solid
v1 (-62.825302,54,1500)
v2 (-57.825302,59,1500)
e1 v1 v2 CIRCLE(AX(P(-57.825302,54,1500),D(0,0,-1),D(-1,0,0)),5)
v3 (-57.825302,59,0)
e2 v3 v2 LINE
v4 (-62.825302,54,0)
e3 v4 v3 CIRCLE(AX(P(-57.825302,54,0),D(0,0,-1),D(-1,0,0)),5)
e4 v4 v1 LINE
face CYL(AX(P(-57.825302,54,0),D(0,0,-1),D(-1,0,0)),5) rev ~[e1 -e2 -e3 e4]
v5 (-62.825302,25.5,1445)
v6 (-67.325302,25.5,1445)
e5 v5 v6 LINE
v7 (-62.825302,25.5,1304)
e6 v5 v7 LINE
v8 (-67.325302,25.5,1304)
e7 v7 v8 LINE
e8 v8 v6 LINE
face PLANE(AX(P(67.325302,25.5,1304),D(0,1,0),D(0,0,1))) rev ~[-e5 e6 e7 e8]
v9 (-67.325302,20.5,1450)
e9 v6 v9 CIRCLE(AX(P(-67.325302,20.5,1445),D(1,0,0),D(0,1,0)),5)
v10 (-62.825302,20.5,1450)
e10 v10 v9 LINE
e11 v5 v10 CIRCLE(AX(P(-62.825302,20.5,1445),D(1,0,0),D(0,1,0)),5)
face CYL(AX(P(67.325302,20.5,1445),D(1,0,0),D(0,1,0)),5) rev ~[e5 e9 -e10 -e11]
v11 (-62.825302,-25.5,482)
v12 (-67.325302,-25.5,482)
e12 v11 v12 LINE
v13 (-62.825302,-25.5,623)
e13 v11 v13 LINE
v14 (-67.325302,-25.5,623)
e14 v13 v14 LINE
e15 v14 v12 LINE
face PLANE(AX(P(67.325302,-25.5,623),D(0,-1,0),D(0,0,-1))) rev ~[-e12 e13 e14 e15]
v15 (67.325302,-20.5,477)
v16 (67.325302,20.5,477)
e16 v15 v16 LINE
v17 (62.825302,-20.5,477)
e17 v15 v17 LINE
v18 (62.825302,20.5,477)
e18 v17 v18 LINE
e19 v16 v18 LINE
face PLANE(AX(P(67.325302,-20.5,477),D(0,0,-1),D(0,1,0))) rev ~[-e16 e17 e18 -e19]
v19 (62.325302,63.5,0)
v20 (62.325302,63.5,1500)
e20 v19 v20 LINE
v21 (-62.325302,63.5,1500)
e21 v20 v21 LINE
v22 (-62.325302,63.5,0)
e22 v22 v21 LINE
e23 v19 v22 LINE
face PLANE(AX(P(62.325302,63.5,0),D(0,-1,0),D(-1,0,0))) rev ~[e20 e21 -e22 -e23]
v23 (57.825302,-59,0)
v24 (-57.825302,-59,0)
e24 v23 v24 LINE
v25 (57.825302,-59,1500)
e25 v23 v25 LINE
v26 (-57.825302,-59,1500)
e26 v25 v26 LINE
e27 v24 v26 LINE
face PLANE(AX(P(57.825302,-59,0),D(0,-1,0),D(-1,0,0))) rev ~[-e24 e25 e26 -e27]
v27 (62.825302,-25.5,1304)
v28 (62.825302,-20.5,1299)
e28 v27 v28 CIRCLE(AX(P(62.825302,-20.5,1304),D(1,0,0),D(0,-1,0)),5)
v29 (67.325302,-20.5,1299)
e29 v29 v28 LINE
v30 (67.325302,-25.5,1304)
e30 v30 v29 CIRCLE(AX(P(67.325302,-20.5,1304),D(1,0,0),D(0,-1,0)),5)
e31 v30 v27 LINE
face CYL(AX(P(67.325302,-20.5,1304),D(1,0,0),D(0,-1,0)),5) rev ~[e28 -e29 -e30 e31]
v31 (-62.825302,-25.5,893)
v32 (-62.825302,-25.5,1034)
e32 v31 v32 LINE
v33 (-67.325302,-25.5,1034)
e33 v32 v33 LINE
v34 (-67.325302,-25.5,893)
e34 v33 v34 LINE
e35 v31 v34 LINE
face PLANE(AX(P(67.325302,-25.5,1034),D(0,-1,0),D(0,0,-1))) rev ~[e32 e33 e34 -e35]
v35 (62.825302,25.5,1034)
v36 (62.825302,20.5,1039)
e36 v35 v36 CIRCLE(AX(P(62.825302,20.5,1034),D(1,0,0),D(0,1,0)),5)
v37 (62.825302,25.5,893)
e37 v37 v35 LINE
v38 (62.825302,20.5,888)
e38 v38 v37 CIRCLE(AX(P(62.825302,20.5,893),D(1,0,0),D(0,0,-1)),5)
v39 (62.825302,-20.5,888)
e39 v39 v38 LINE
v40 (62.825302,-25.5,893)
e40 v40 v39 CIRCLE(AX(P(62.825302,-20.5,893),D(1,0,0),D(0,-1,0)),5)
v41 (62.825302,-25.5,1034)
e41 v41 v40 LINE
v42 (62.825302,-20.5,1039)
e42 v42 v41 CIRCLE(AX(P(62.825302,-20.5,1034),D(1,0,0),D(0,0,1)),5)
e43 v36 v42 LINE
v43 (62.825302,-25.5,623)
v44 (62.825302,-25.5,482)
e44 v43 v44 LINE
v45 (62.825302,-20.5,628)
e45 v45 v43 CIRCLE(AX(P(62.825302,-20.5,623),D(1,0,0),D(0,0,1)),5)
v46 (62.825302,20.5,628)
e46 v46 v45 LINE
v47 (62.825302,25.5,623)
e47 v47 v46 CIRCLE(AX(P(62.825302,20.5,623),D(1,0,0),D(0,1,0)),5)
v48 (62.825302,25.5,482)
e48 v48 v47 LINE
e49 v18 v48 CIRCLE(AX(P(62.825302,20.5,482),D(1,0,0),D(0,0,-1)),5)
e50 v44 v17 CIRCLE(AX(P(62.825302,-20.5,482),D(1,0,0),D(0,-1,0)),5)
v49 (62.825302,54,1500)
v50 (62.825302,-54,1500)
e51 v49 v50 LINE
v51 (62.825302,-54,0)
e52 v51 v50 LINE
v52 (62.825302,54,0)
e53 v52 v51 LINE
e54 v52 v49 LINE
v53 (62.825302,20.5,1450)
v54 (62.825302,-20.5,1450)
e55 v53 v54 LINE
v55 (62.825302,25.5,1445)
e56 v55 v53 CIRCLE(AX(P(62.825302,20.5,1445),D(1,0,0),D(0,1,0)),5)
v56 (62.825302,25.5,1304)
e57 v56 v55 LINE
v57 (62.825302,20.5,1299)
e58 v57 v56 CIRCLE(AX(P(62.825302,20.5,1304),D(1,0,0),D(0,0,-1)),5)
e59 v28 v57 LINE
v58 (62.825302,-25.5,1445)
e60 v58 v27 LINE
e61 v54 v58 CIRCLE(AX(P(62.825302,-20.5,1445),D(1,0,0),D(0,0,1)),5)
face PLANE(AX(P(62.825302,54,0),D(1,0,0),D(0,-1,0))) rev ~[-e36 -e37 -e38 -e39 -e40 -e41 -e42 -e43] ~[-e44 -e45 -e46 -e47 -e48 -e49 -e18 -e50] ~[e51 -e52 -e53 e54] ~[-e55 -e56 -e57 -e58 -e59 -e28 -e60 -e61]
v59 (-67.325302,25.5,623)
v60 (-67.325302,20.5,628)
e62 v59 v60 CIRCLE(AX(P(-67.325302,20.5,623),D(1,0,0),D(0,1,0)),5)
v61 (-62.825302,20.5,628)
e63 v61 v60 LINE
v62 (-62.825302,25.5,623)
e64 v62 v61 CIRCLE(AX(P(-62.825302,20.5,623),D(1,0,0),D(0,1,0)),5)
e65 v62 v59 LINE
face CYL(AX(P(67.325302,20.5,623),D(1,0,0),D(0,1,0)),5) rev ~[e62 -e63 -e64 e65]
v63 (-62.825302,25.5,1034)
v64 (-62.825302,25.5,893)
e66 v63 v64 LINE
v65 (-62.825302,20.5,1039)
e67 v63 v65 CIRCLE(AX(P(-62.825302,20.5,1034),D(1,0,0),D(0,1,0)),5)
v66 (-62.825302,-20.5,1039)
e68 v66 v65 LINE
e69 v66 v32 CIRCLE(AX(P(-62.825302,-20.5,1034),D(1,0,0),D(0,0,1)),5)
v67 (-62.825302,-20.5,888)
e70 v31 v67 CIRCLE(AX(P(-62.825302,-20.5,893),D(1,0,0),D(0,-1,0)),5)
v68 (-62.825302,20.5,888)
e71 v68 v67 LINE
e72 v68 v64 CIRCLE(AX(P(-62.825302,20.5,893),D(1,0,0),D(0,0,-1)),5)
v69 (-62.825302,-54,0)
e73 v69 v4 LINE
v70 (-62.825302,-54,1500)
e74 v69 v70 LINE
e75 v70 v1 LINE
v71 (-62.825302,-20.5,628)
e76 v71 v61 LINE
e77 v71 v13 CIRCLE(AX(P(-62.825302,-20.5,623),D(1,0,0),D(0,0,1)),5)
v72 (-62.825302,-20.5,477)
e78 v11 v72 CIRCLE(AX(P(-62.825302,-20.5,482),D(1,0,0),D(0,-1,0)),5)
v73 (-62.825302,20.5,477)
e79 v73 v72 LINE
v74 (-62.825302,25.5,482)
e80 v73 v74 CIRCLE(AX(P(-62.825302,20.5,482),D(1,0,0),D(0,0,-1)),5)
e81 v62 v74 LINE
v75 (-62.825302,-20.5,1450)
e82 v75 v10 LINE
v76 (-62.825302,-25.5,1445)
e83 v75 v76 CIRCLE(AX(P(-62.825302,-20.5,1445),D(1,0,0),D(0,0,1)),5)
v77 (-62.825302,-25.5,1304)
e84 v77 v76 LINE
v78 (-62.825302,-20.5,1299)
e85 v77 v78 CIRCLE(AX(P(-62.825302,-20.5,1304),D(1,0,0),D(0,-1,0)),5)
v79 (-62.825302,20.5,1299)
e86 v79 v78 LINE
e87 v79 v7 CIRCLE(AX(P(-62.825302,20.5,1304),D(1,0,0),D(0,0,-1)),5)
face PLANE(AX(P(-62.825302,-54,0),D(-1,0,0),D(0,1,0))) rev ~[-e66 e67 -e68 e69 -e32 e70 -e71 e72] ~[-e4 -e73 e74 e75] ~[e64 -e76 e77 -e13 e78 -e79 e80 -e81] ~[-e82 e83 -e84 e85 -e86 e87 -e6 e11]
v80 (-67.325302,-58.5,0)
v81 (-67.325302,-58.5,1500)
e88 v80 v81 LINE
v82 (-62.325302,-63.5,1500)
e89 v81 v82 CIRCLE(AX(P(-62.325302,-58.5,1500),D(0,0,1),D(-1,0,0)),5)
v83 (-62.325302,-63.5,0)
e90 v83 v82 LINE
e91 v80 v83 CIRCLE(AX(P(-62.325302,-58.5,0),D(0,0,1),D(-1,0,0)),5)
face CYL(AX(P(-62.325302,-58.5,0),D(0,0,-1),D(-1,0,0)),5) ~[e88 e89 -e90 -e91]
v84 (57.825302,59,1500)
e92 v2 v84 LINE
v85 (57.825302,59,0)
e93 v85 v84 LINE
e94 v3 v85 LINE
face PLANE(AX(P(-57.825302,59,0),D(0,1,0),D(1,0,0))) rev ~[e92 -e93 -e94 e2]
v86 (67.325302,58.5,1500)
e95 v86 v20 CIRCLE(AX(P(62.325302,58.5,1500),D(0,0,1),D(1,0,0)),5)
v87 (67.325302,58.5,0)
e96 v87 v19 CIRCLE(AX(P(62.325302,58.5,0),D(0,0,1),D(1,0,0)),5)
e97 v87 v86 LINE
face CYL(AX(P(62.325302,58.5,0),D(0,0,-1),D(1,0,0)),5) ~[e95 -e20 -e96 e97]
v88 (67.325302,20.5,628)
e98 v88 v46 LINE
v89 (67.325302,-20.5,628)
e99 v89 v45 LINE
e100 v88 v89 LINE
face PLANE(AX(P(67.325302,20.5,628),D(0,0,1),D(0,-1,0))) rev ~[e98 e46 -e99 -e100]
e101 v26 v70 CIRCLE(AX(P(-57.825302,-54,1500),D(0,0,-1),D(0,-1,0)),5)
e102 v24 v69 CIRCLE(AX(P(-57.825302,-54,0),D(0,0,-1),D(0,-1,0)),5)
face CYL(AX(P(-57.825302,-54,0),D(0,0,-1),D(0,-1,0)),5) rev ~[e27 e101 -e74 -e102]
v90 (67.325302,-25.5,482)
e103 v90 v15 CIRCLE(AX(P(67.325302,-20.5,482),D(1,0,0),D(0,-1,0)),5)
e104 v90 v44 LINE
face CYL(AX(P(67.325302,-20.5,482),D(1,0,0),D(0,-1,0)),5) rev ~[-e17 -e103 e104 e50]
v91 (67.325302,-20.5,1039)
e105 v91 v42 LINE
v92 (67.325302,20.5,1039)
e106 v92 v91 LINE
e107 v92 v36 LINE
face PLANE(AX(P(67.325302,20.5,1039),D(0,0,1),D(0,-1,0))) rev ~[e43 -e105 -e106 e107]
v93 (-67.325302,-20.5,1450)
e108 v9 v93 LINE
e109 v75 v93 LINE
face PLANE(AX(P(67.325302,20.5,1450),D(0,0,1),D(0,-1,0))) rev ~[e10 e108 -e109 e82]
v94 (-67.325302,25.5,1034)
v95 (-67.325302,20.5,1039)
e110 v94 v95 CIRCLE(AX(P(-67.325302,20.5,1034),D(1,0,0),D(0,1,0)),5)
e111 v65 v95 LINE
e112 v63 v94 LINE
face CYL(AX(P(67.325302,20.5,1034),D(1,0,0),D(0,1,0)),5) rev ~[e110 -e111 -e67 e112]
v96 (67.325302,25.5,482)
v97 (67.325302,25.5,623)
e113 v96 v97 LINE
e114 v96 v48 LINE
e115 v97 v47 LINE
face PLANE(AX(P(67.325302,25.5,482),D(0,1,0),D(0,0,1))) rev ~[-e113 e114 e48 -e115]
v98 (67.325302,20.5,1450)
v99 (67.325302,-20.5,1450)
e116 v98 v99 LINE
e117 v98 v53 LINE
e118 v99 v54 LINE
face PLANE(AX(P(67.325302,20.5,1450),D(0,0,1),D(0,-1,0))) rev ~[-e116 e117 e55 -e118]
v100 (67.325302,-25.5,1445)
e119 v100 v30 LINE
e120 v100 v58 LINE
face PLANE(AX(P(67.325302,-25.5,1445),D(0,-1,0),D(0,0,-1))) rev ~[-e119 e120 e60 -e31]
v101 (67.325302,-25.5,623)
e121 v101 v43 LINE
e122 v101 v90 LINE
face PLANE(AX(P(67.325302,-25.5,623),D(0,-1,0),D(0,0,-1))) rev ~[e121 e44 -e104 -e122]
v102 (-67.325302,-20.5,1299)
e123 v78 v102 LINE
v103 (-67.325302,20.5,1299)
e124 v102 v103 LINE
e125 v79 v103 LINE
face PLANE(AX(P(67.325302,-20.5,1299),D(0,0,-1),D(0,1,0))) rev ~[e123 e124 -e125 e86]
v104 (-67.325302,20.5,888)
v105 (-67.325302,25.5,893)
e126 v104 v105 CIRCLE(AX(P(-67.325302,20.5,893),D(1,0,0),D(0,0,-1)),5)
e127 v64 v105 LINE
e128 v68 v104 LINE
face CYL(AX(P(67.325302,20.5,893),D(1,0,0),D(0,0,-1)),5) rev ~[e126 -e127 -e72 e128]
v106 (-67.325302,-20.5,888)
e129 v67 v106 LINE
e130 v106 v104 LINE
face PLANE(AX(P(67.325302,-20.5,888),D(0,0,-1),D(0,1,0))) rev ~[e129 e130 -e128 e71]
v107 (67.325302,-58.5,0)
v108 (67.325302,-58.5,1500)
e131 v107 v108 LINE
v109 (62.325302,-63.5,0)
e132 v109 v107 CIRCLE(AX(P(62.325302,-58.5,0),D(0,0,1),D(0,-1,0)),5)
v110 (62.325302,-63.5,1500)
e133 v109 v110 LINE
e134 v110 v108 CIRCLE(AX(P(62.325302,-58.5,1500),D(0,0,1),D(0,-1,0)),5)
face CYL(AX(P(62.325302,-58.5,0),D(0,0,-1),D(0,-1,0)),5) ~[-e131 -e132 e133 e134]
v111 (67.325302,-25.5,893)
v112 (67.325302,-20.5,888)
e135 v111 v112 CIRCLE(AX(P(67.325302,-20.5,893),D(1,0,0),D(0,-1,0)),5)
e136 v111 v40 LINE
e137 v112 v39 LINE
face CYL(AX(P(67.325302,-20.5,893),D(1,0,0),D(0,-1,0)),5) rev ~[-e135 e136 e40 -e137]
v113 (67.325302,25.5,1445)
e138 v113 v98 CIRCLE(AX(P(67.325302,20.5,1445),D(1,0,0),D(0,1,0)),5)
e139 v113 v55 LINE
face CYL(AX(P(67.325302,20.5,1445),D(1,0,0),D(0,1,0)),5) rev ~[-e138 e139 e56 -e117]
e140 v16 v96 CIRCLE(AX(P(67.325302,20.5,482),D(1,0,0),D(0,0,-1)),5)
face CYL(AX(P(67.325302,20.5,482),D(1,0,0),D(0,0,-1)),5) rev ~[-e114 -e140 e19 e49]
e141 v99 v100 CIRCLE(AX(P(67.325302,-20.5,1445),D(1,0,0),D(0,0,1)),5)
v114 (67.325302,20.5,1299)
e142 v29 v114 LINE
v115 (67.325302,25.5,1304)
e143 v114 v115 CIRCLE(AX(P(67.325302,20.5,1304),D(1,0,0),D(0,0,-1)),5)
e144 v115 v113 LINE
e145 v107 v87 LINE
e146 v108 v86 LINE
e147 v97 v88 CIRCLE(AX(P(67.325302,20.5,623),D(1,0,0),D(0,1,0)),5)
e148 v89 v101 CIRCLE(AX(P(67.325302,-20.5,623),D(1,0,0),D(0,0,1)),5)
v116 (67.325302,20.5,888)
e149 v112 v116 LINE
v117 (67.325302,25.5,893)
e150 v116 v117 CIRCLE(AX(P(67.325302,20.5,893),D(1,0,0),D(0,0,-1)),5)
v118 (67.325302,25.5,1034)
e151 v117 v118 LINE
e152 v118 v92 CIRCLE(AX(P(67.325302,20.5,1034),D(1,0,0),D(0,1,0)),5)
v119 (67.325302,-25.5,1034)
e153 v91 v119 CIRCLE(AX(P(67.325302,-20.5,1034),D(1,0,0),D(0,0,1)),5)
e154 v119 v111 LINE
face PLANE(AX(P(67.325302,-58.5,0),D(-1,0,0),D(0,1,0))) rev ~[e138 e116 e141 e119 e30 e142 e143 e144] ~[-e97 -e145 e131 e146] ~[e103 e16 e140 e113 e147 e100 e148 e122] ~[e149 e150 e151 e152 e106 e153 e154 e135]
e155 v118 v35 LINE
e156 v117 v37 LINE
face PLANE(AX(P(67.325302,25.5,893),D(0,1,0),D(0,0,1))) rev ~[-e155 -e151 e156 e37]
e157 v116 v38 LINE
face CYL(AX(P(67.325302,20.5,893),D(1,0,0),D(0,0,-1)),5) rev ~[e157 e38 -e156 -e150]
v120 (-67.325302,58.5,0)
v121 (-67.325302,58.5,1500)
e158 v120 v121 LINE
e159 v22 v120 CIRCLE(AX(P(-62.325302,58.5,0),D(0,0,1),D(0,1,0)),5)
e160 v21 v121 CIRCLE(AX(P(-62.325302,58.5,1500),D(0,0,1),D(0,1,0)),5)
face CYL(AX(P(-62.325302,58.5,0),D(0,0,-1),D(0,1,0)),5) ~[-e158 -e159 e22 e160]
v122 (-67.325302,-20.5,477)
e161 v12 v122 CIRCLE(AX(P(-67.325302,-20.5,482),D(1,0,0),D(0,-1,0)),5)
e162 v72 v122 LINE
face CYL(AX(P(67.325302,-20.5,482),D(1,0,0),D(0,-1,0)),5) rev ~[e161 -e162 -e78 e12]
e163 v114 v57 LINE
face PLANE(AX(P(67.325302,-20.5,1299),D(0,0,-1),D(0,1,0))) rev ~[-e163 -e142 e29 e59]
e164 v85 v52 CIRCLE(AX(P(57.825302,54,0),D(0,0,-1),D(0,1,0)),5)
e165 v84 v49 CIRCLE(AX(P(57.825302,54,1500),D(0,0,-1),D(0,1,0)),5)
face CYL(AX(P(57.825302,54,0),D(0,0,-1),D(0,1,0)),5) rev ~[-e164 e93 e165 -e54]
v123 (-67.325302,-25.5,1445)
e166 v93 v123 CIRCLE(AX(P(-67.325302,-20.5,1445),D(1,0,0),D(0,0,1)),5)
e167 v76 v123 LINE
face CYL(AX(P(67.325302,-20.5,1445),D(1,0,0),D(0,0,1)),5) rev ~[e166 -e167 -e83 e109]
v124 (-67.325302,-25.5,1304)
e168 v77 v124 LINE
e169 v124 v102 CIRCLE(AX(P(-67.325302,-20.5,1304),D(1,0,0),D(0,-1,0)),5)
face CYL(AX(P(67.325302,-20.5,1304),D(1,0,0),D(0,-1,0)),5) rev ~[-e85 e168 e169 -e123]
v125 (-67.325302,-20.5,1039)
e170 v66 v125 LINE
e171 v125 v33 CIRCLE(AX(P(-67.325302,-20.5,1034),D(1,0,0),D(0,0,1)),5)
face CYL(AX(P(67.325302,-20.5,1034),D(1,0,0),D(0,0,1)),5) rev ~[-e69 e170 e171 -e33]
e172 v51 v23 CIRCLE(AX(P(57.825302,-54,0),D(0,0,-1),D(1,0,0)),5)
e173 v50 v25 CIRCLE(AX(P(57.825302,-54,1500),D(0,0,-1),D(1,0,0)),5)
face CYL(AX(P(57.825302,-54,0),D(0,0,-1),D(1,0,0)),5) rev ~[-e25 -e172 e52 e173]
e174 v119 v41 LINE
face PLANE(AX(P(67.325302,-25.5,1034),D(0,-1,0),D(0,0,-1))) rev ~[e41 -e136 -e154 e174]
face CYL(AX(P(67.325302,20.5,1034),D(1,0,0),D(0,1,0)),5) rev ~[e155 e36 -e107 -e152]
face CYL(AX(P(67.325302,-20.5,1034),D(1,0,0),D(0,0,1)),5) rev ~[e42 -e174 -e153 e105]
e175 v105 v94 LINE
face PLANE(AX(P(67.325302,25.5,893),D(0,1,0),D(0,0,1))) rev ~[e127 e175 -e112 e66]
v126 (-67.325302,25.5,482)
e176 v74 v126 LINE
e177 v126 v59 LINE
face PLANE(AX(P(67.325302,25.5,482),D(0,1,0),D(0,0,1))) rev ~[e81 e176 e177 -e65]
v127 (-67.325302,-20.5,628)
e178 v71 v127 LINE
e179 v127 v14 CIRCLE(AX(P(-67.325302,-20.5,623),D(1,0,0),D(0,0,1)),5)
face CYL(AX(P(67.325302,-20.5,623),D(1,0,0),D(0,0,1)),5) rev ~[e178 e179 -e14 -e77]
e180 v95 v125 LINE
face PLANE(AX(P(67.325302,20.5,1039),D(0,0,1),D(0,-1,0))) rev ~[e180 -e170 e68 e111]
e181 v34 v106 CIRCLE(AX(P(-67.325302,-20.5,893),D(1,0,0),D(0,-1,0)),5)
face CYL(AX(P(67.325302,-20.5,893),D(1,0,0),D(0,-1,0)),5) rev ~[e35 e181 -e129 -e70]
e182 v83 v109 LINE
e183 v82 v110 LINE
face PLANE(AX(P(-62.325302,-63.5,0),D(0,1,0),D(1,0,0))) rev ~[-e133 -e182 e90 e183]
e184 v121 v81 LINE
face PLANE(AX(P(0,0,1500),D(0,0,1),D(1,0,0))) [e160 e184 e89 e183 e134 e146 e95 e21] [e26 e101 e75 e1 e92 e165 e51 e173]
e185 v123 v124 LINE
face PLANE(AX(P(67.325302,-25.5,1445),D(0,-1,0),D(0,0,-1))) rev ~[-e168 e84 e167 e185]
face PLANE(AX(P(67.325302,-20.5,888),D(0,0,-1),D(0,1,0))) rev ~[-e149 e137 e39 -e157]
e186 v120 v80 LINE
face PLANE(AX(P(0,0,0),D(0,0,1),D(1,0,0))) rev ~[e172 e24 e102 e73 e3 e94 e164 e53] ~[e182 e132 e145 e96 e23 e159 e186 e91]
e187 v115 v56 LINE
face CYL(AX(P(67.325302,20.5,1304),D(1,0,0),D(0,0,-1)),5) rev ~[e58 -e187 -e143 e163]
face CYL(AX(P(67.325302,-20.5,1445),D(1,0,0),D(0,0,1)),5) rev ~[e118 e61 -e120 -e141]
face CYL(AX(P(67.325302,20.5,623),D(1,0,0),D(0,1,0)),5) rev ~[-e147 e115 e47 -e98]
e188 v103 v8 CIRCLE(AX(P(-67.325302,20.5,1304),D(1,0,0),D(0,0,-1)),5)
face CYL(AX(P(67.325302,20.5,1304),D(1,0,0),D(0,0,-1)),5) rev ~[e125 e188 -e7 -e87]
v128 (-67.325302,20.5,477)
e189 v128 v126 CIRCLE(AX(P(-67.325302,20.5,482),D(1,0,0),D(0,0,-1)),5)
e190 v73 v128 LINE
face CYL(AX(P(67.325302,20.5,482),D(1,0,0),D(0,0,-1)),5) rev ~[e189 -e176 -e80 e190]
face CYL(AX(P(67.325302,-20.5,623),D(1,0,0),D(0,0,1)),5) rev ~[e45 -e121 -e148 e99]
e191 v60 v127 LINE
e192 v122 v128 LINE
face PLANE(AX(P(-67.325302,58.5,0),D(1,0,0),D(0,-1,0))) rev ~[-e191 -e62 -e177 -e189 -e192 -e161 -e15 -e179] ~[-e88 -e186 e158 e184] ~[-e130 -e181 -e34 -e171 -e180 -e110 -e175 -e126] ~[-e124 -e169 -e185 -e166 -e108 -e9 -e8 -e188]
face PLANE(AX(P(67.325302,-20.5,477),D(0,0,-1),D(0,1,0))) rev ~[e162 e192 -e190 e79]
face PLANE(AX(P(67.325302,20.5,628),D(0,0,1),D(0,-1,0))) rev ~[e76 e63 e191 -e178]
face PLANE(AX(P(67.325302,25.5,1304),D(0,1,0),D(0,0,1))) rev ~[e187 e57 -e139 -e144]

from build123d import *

# Parameters (mm, degrees)
F1_DEPTH = 1500
F4_DEPTH = 150


# Not quite as in the source:
# - the program builds the solid bodies; features that only make, move or delete a surface that nothing else refers to are left out


with BuildPart() as f1:
    # F0 (on Top) → F1 (new body)
    with BuildSketch(Plane.XY):
        with BuildLine():
            Line((-62.3253015232, -63.5), (62.3253015232, -63.5))
            ThreePointArc((62.3253015232, -63.5), (65.8608354292, -62.0355339059), (67.3253015232, -58.5))
            Line((67.3253015232, -58.5), (67.3253015232, 58.5))
            ThreePointArc((67.3253015232, 58.5), (65.8608354292, 62.0355339059), (62.3253015232, 63.5))
            Line((62.3253015232, 63.5), (-62.3253015232, 63.5))
            ThreePointArc((-62.3253015232, 63.5), (-65.8608354292, 62.0355339059), (-67.3253015232, 58.5))
            Line((-67.3253015232, 58.5), (-67.3253015232, -58.5))
            ThreePointArc((-67.3253015232, -58.5), (-65.8608354292, -62.0355339059), (-62.3253015232, -63.5))
        make_face()
        with BuildLine():
            Line((-57.8253015232, 59), (57.8253015232, 59))
            ThreePointArc((57.8253015232, 59), (61.3608354292, 57.5355339059), (62.8253015232, 54))
            Line((62.8253015232, 54), (62.8253015232, -54))
            ThreePointArc((62.8253015232, -54), (61.3608354292, -57.5355339059), (57.8253015232, -59))
            Line((57.8253015232, -59), (-57.8253015232, -59))
            ThreePointArc((-57.8253015232, -59), (-61.3608354292, -57.5355339059), (-62.8253015232, -54))
            Line((-62.8253015232, -54), (-62.8253015232, 54))
            ThreePointArc((-62.8253015232, 54), (-61.3608354292, 57.5355339059), (-57.8253015232, 59))
        make_face(mode=Mode.SUBTRACT)
    extrude(amount=F1_DEPTH)

    # F2 (on face) → F4 (cut)
    with BuildSketch(Plane.YZ.offset(67.3253015232)):
        with BuildLine():
            ThreePointArc((-25.5, 1304), (-24.0355339059, 1300.4644660941), (-20.5, 1299))
            Line((-20.5, 1299), (20.5, 1299))
            ThreePointArc((20.5, 1299), (24.0355339059, 1300.4644660941), (25.5, 1304))
            Line((25.5, 1304), (25.5, 1445))
            ThreePointArc((25.5, 1445), (24.0355339059, 1448.5355339059), (20.5, 1450))
            Line((20.5, 1450), (-20.5, 1450))
            ThreePointArc((-20.5, 1450), (-24.0355339059, 1448.5355339059), (-25.5, 1445))
            Line((-25.5, 1445), (-25.5, 1304))
        make_face()
        with BuildLine():
            ThreePointArc((-25.5, 893), (-24.0355339059, 889.4644660941), (-20.5, 888))
            Line((-20.5, 888), (20.5, 888))
            ThreePointArc((20.5, 888), (24.0355339059, 889.4644660941), (25.5, 893))
            Line((25.5, 893), (25.5, 1034))
            ThreePointArc((25.5, 1034), (24.0355339059, 1037.5355339059), (20.5, 1039))
            Line((20.5, 1039), (-20.5, 1039))
            ThreePointArc((-20.5, 1039), (-24.0355339059, 1037.5355339059), (-25.5, 1034))
            Line((-25.5, 1034), (-25.5, 893))
        make_face()
        with BuildLine():
            ThreePointArc((-25.5, 482), (-24.0355339059, 478.4644660941), (-20.5, 477))
            Line((-20.5, 477), (20.5, 477))
            ThreePointArc((20.5, 477), (24.0355339059, 478.4644660941), (25.5, 482))
            Line((25.5, 482), (25.5, 623))
            ThreePointArc((25.5, 623), (24.0355339059, 626.5355339059), (20.5, 628))
            Line((20.5, 628), (-20.5, 628))
            ThreePointArc((-20.5, 628), (-24.0355339059, 626.5355339059), (-25.5, 623))
            Line((-25.5, 623), (-25.5, 482))
        make_face()
    extrude(amount=-F4_DEPTH, mode=Mode.SUBTRACT)


solid = f1.part
